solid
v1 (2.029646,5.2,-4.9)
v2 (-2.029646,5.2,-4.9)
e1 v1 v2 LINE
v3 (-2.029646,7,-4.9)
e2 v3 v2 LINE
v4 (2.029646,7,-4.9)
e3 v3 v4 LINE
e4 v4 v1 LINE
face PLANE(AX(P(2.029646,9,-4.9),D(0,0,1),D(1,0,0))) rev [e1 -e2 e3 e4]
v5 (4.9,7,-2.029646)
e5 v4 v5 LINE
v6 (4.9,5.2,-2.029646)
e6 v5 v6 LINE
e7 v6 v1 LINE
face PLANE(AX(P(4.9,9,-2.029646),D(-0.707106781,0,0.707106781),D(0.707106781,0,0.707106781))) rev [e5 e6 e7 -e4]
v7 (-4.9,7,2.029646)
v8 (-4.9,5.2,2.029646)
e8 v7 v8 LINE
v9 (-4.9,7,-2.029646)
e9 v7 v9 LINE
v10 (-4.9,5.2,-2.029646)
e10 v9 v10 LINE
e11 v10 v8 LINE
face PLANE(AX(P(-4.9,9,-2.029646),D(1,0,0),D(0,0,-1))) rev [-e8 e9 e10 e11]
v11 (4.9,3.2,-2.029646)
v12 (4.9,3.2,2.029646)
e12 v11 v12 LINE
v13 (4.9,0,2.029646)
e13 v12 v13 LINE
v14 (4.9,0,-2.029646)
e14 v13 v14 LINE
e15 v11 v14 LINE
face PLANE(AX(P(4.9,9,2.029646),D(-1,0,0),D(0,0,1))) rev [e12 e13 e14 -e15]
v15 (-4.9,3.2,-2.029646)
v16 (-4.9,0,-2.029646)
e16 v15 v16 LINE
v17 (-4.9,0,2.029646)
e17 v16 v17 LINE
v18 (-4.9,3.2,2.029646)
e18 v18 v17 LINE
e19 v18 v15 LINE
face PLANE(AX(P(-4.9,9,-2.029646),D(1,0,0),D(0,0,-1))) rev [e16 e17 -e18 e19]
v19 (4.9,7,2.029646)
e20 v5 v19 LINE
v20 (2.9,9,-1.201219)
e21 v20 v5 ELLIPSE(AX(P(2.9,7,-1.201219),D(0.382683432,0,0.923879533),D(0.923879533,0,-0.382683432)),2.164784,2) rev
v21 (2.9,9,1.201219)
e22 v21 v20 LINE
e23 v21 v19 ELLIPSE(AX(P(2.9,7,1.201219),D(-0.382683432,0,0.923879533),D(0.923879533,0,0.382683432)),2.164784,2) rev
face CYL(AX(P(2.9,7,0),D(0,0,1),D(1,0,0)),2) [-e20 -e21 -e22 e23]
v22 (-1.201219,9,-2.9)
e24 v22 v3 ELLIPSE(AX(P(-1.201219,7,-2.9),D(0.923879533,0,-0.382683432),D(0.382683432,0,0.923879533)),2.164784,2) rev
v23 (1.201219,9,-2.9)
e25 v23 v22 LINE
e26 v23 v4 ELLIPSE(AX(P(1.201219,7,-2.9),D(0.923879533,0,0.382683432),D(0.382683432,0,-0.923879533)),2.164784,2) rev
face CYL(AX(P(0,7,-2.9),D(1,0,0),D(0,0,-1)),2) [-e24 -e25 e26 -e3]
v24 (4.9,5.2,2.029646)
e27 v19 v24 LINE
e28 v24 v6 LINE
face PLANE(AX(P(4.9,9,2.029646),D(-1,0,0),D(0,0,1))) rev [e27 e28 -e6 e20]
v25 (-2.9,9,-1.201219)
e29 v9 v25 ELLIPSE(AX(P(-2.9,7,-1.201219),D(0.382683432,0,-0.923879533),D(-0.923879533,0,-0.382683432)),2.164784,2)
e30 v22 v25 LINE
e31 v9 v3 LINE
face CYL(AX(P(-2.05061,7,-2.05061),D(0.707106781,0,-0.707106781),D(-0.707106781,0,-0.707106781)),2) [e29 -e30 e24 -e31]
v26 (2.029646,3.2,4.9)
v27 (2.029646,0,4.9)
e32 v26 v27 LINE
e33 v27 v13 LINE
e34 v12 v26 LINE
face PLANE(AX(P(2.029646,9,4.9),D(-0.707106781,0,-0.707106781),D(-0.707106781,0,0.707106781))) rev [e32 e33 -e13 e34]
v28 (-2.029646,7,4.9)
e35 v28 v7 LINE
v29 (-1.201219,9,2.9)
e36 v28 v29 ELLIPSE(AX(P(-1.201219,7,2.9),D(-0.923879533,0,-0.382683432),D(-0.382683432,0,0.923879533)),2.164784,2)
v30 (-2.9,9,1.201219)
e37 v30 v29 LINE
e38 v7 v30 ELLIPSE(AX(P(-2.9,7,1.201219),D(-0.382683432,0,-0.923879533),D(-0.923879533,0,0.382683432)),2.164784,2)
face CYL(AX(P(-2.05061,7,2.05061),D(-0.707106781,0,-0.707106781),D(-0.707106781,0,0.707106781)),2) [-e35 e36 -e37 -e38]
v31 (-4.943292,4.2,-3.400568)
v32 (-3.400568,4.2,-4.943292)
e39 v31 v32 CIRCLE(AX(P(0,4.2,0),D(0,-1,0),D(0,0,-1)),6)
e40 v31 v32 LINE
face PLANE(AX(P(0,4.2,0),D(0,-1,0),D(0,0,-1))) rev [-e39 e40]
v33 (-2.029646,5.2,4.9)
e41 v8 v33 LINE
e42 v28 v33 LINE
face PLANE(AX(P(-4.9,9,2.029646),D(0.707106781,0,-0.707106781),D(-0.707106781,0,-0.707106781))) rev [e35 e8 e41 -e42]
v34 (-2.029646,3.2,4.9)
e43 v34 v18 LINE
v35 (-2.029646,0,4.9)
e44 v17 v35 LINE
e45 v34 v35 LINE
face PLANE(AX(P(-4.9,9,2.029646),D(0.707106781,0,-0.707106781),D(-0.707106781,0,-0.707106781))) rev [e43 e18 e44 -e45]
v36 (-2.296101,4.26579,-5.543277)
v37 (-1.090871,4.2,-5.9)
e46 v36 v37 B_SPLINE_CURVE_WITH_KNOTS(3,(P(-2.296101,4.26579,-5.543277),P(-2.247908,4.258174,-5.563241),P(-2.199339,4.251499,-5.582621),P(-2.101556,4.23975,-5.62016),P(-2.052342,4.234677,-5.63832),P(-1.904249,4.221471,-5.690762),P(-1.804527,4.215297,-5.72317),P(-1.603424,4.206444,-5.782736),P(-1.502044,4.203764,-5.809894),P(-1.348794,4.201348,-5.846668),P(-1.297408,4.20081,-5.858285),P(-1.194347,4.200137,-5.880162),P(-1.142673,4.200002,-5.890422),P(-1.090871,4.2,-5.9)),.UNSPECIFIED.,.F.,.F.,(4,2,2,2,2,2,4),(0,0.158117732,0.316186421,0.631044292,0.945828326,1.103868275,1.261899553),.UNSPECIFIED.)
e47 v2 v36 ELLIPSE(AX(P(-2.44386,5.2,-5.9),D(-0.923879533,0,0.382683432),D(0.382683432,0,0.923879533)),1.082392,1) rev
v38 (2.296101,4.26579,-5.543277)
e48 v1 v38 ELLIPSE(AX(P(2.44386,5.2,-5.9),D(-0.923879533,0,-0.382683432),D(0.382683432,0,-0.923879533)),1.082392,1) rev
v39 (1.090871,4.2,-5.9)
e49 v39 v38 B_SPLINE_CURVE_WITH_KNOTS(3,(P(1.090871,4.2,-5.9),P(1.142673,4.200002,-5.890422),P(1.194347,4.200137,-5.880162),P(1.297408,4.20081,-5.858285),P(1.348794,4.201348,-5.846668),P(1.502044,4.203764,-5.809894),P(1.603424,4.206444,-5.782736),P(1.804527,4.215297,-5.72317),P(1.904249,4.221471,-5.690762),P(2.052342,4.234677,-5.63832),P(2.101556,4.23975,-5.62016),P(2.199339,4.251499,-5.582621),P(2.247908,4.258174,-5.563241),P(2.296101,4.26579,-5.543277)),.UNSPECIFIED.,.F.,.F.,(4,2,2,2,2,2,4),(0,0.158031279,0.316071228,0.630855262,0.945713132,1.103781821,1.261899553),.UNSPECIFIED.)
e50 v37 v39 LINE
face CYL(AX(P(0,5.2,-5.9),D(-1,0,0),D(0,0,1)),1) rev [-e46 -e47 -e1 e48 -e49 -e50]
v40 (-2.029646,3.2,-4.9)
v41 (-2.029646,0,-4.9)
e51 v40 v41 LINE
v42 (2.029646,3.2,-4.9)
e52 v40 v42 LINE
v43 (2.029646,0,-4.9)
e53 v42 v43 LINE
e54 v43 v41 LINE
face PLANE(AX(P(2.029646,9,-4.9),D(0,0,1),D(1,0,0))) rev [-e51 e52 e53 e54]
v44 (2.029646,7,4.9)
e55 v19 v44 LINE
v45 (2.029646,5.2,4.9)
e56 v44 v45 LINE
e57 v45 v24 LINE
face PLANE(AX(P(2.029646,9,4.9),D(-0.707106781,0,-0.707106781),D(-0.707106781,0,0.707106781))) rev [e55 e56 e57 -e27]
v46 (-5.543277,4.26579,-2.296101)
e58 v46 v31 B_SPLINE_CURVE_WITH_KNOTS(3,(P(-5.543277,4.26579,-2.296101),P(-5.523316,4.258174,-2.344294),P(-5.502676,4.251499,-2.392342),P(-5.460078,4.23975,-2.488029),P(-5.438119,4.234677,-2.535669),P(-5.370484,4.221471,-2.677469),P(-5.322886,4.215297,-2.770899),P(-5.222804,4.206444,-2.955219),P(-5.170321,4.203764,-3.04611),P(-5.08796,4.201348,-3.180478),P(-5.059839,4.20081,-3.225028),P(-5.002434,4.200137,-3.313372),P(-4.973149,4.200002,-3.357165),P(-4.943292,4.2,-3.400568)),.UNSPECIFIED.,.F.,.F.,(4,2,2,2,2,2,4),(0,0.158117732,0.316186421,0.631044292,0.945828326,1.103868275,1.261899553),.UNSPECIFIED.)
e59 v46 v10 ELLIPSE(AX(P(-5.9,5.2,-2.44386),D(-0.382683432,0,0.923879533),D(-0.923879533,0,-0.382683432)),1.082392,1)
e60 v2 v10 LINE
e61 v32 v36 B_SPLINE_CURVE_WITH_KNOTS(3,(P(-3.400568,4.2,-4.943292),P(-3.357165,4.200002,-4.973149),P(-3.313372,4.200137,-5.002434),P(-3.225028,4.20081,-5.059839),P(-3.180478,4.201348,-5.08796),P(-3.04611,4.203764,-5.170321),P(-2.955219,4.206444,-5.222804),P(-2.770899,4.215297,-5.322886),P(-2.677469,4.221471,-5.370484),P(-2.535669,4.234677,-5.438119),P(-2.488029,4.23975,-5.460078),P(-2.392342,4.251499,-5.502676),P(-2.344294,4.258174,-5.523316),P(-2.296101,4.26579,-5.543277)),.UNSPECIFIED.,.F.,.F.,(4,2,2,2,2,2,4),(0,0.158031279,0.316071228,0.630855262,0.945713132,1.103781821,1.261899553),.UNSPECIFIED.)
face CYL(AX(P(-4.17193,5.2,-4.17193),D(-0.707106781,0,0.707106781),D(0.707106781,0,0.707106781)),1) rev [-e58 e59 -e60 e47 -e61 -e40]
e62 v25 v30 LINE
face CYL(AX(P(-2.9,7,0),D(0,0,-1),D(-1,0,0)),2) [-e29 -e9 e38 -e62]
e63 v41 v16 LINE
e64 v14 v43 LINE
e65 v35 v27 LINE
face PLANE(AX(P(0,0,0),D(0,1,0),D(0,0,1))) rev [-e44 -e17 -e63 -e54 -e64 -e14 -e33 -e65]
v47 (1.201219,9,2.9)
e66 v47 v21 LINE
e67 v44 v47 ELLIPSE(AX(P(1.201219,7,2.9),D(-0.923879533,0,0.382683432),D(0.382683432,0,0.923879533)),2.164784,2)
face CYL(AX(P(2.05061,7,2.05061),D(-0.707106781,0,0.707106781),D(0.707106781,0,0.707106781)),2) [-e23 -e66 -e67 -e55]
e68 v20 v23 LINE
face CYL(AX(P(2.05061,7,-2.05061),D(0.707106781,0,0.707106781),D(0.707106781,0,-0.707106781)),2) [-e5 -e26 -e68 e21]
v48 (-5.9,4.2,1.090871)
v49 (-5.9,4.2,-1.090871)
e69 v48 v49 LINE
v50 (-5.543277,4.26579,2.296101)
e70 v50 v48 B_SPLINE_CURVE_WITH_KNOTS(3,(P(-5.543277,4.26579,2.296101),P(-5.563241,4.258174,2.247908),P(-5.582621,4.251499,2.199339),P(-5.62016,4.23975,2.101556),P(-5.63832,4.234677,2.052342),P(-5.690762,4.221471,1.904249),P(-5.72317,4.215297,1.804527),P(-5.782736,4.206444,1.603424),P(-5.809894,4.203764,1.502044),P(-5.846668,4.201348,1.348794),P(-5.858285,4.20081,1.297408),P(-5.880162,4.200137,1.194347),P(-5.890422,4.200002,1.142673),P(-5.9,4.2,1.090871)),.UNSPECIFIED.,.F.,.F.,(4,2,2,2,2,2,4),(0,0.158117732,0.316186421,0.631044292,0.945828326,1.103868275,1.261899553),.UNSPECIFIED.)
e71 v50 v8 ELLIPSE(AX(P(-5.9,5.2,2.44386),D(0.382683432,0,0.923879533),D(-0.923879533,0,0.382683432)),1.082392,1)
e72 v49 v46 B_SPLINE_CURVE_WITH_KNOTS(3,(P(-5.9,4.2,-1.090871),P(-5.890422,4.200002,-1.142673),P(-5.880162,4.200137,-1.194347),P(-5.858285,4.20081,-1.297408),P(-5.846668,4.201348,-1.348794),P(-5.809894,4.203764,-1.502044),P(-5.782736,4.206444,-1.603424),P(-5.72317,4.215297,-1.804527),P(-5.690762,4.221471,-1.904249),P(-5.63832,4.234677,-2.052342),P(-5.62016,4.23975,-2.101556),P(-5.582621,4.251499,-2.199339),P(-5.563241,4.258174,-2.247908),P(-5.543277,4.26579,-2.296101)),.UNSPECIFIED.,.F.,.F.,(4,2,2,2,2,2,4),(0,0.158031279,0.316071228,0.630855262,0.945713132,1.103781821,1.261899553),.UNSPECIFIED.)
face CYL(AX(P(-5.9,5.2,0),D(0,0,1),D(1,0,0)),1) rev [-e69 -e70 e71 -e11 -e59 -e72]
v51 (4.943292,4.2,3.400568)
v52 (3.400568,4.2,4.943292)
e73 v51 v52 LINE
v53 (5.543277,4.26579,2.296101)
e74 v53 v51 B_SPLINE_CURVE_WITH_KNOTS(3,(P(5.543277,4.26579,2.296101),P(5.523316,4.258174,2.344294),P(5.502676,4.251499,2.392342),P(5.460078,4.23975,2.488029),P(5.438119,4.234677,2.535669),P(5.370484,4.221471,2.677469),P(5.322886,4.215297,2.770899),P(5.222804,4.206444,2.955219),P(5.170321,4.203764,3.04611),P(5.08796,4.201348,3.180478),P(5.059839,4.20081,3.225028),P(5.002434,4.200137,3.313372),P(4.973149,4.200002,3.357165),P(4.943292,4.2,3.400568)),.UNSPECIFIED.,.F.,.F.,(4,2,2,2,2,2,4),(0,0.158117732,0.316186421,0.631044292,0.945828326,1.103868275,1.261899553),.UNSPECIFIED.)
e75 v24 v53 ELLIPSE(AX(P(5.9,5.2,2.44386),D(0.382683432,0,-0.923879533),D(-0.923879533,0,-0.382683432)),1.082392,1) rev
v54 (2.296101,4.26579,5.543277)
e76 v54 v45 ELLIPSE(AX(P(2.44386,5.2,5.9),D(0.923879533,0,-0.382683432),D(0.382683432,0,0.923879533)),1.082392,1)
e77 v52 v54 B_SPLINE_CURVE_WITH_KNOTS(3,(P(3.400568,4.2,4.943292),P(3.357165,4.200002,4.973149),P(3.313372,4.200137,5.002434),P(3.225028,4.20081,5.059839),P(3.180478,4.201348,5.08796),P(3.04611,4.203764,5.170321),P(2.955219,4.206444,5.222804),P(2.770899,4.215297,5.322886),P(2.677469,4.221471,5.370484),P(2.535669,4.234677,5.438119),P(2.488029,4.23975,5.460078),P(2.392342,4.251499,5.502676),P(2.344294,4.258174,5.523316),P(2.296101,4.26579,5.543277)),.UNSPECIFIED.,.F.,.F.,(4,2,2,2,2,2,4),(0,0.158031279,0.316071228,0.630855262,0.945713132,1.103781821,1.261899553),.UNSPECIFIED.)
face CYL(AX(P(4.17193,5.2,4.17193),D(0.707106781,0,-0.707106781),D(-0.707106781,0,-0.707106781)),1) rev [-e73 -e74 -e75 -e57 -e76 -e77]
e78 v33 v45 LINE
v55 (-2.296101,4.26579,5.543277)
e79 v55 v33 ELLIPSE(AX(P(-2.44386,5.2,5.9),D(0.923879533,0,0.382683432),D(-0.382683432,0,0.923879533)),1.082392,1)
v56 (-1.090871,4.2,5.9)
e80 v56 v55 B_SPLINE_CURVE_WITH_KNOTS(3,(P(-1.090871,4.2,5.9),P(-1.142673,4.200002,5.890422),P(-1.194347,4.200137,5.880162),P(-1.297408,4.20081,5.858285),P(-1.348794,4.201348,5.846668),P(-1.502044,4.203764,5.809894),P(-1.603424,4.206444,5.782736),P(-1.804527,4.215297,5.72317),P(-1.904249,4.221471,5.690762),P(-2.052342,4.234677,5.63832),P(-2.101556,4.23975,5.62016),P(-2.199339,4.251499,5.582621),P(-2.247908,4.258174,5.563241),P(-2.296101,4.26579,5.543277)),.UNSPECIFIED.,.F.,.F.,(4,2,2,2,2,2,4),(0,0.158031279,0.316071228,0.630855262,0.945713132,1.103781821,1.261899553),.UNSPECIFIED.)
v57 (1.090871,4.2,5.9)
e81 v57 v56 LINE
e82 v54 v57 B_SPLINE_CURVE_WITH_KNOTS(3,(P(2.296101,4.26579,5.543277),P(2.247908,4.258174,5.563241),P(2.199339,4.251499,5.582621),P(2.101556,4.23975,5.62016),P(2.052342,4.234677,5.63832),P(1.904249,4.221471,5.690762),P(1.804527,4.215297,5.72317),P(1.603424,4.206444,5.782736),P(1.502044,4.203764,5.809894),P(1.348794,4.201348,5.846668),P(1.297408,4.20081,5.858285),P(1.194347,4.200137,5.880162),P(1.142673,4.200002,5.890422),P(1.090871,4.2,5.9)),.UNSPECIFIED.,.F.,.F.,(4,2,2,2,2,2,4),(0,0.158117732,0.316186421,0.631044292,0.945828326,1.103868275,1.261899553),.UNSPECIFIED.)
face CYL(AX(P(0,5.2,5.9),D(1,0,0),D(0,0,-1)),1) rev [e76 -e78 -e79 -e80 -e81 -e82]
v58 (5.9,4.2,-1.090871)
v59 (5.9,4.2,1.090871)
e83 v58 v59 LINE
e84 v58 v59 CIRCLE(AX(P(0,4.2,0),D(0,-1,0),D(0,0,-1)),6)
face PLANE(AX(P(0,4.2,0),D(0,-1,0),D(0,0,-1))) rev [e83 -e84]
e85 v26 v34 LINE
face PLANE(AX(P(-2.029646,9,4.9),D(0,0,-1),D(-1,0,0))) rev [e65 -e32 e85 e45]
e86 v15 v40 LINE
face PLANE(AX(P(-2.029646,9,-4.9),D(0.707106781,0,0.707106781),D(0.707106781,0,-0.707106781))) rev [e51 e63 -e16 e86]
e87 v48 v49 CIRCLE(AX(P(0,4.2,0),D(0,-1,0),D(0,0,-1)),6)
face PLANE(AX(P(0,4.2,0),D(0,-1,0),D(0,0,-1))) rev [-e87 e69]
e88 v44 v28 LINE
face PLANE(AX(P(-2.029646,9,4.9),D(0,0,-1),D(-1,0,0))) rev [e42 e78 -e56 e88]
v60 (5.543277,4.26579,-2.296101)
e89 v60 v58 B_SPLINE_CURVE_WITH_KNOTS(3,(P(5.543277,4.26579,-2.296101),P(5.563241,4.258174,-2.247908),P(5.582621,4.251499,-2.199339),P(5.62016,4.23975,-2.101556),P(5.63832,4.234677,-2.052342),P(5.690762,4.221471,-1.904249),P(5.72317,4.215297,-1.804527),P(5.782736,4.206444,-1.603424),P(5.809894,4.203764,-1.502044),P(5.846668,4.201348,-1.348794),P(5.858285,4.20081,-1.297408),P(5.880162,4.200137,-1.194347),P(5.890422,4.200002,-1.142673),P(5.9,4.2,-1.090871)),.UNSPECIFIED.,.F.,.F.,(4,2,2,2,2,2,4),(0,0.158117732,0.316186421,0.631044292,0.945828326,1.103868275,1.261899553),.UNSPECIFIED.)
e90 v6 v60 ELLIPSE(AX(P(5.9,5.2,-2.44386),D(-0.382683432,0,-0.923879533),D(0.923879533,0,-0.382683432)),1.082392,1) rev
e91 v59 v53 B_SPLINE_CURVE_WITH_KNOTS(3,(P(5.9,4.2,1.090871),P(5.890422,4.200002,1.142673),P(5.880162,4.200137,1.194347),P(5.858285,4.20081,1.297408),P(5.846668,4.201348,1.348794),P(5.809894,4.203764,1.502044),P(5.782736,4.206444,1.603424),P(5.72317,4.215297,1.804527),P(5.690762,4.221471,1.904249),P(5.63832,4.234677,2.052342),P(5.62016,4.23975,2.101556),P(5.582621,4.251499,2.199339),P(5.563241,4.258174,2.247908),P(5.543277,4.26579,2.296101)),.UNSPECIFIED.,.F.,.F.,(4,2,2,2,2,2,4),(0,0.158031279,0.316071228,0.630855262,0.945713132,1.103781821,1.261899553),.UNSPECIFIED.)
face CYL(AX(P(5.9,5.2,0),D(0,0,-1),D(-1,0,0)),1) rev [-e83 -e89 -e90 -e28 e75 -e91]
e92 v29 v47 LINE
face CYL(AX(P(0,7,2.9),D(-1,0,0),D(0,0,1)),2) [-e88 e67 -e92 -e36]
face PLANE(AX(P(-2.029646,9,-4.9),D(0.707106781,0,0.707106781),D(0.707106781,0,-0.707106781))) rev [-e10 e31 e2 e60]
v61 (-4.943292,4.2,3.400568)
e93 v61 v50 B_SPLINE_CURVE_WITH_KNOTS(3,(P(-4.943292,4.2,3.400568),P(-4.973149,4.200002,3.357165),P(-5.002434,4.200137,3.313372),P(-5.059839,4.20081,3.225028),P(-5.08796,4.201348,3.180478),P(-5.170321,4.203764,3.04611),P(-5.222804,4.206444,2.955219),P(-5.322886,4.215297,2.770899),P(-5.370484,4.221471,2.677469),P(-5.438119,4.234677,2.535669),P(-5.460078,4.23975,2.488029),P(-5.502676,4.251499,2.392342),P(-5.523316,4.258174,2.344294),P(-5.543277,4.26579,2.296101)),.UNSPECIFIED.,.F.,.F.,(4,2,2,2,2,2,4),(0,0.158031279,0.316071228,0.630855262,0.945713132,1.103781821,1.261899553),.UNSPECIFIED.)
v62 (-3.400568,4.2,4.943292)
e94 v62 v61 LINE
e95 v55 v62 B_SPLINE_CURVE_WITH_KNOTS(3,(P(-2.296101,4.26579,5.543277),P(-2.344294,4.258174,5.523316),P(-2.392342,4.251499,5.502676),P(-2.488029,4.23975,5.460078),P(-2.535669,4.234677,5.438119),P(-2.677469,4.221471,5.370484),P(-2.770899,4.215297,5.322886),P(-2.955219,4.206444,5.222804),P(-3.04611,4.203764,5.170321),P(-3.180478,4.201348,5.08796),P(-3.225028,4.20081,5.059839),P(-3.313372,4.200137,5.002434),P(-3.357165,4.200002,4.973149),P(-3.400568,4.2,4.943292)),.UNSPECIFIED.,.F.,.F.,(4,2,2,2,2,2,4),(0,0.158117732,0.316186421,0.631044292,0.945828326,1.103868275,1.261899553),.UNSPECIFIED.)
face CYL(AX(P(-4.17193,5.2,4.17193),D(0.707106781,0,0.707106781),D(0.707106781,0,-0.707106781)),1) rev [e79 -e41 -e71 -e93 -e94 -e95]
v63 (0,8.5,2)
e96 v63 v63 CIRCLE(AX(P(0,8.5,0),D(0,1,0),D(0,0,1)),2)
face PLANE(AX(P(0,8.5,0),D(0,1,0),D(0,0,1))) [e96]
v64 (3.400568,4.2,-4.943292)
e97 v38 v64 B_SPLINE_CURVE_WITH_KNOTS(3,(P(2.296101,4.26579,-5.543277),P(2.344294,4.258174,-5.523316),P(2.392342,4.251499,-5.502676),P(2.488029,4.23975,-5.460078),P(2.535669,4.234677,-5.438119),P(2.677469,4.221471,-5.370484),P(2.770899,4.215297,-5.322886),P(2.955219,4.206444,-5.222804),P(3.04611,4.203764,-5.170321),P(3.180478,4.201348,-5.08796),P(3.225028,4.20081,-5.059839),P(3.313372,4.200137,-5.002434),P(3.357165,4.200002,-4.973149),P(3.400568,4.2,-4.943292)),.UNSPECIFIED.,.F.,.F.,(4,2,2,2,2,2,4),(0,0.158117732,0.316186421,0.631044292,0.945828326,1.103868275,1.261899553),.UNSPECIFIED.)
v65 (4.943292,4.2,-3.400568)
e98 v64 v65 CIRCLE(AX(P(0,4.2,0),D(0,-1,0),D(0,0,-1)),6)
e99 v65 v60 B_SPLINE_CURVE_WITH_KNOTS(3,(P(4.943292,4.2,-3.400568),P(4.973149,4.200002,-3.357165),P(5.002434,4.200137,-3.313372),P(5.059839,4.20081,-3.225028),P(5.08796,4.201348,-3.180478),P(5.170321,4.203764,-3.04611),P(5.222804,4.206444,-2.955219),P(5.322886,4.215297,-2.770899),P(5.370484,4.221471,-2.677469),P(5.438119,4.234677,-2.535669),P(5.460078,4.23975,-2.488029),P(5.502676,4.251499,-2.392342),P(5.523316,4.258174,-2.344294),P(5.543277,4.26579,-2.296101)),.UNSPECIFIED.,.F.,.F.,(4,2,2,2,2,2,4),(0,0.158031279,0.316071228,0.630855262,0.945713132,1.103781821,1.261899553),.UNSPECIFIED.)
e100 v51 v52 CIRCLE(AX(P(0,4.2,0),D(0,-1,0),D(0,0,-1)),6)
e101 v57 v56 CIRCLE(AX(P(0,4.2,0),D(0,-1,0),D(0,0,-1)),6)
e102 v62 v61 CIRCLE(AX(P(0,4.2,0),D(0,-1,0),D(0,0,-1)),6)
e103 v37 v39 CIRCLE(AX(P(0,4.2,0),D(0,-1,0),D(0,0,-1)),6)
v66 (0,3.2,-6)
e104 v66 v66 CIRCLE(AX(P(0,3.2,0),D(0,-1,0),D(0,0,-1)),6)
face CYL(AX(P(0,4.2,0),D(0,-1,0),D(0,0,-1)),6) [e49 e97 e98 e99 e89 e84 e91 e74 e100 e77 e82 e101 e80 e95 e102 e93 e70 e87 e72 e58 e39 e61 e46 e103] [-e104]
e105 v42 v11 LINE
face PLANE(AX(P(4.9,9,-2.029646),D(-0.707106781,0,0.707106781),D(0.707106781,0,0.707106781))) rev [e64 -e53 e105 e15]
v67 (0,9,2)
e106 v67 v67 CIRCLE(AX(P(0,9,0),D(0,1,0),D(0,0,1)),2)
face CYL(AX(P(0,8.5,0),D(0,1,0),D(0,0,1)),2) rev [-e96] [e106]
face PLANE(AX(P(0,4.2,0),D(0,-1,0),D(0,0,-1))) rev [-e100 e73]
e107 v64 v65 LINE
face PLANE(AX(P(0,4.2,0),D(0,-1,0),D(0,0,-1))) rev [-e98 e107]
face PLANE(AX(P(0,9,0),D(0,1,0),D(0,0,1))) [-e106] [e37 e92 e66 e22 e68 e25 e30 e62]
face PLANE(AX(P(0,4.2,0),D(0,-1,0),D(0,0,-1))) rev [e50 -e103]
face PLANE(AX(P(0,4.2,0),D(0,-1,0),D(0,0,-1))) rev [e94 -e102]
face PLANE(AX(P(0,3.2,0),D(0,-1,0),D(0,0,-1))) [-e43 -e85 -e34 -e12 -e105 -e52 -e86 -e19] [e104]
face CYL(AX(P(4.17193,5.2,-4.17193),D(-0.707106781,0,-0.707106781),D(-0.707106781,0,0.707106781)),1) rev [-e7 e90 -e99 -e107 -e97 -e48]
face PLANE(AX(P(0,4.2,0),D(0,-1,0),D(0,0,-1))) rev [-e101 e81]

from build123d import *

# Parameters (mm, degrees)
BOSS_EXTRUDE1_DEPTH = 9
SKETCH2_R           = 2
CUT_EXTRUDE1_DEPTH  = 0.5
BOSS_EXTRUDE2_START = -3.2
SKETCH3_R           = 6
BOSS_EXTRUDE2_DEPTH = 1
FILLET1_R           = 2
FILLET2_R           = 1


with BuildPart() as part:
    # Sketch1 → Boss-Extrude1 (new body)
    with BuildSketch(Plane(origin=(0, 0, 0), x_dir=(1, 0, 0), z_dir=(0, 1, 0))):
        Polygon((2.029646456, 4.9), (-2.029646456, 4.9), (-4.9, 2.029646456), (-4.9, -2.029646456), (-2.029646456, -4.9), (2.029646456, -4.9), (4.9, -2.029646456), (4.9, 2.029646456), align=None)
    extrude(amount=BOSS_EXTRUDE1_DEPTH)

    # Sketch2 → Cut-Extrude1 (cut)
    with BuildSketch(Plane(origin=(0, 9, 0), x_dir=(1, 0, 0), z_dir=(0, 1, 0))):
        with Locations(Location((0, 0, 0), (0, 0, 270))):
            Circle(SKETCH2_R)
    extrude(amount=-CUT_EXTRUDE1_DEPTH, mode=Mode.SUBTRACT)

    # Sketch3 → Boss-Extrude2 (add)
    with BuildSketch(Plane.XZ.offset(BOSS_EXTRUDE2_START)):
        with Locations(Location((0, 0, 0), (0, 0, 270))):
            Circle(SKETCH3_R)
    extrude(amount=-BOSS_EXTRUDE2_DEPTH)

    # Fillet1
    fillet1_edges = [part.edges().sort_by_distance(p)[0] for p in [
        (-3.464823228, 9, -3.464823228),
        (-4.9, 9, 0),
        (-3.464823228, 9, 3.464823228),
        (0, 9, 4.9),
        (3.464823228, 9, 3.464823228),
        (4.9, 9, 0),
        (3.464823228, 9, -3.464823228),
        (0, 9, -4.9),
    ]]
    fillet(fillet1_edges, radius=FILLET1_R)

    # Fillet2
    # the kernel refuses this fillet: 1 mm, written as the material it adds along each edge
    with BuildSketch(Plane(origin=(4.9, 4.2, -4.529646456), x_dir=(1, 0, 0), z_dir=(0, 0, 1))) as fillet2_piece_1_section:
        with BuildLine():
            CenterArc((FILLET2_R, FILLET2_R), FILLET2_R, 180, 90)
            Line((0, FILLET2_R), (0, 0))
            Line((0, 0), (FILLET2_R, 0))
        make_face()
    fillet2_piece_1 = extrude(amount=9.059292911, mode=Mode.PRIVATE)
    fillet2_piece_1 = split(fillet2_piece_1, bisect_by=Plane(origin=(6.015133886, 4.441621339, -0.91451257), z_dir=(-0.7071067811865472, 0, 0.7071067811865478)), keep=Keep.TOP, mode=Mode.PRIVATE)
    fillet2_piece_1 = split(fillet2_piece_1, bisect_by=Plane(origin=(6.015133886, 4.441621339, 0.91451257), z_dir=(-0.7071067811865478, 0, -0.7071067811865474)), keep=Keep.TOP, mode=Mode.PRIVATE)
    add(fillet2_piece_1)
    with BuildSketch(Plane(origin=(-4.529646456, 4.2, -4.9), x_dir=(0, 1, 0), z_dir=(1, 0, 0))) as fillet2_piece_2_section:
        with BuildLine():
            CenterArc((FILLET2_R, -FILLET2_R), FILLET2_R, 90, 90)
            Line((0, -FILLET2_R), (0, 0))
            Line((0, 0), (FILLET2_R, 0))
        make_face()
    fillet2_piece_2 = extrude(amount=9.059292911, mode=Mode.PRIVATE)
    fillet2_piece_2 = split(fillet2_piece_2, bisect_by=Plane(origin=(-0.91451257, 4.441621339, -6.015133886), z_dir=(0.7071067811865479, 0, 0.7071067811865472)), keep=Keep.TOP, mode=Mode.PRIVATE)
    fillet2_piece_2 = split(fillet2_piece_2, bisect_by=Plane(origin=(0.91451257, 4.441621339, -6.015133886), z_dir=(-0.7071067811865472, 0, 0.7071067811865478)), keep=Keep.TOP, mode=Mode.PRIVATE)
    add(fillet2_piece_2)
    with BuildSketch(Plane(origin=(0.261879503, 4.2, -6.667766953), x_dir=(0.7071067811865472, 0, -0.7071067811865479), z_dir=(0.7071067811865479, 0, 0.7071067811865474))) as fillet2_piece_3_section:
        with BuildLine():
            CenterArc((FILLET2_R, FILLET2_R), FILLET2_R, 180, 90)
            Line((0, FILLET2_R), (0, 0))
            Line((0, 0), (FILLET2_R, 0))
        make_face()
    fillet2_piece_3 = extrude(amount=9.059292911, mode=Mode.PRIVATE)
    fillet2_piece_3 = split(fillet2_piece_3, bisect_by=Plane(origin=(3.606683921, 4.441621339, -4.9), z_dir=(0, 0, 1)), keep=Keep.TOP, mode=Mode.PRIVATE)
    fillet2_piece_3 = split(fillet2_piece_3, bisect_by=Plane(origin=(4.9, 4.441621339, -3.606683921), z_dir=(-1, 0, 0)), keep=Keep.TOP, mode=Mode.PRIVATE)
    add(fillet2_piece_3)
    with BuildSketch(Plane(origin=(6.667766953, 4.2, 0.261879503), x_dir=(0.7071067811865478, 0, 0.7071067811865474), z_dir=(-0.7071067811865474, 0, 0.7071067811865478))) as fillet2_piece_4_section:
        with BuildLine():
            CenterArc((FILLET2_R, FILLET2_R), FILLET2_R, 180, 90)
            Line((0, FILLET2_R), (0, 0))
            Line((0, 0), (FILLET2_R, 0))
        make_face()
    fillet2_piece_4 = extrude(amount=9.059292911, mode=Mode.PRIVATE)
    fillet2_piece_4 = split(fillet2_piece_4, bisect_by=Plane(origin=(4.9, 4.441621339, 3.606683921), z_dir=(-1, 0, 0)), keep=Keep.TOP, mode=Mode.PRIVATE)
    fillet2_piece_4 = split(fillet2_piece_4, bisect_by=Plane(origin=(3.606683921, 4.441621339, 4.9), z_dir=(0, 0, -1)), keep=Keep.TOP, mode=Mode.PRIVATE)
    add(fillet2_piece_4)
    with BuildSketch(Plane(origin=(4.529646456, 4.2, 4.9), x_dir=(0, 0, 1), z_dir=(-1, 0, 0))) as fillet2_piece_5_section:
        with BuildLine():
            CenterArc((FILLET2_R, FILLET2_R), FILLET2_R, 180, 90)
            Line((0, FILLET2_R), (0, 0))
            Line((0, 0), (FILLET2_R, 0))
        make_face()
    fillet2_piece_5 = extrude(amount=9.059292911, mode=Mode.PRIVATE)
    fillet2_piece_5 = split(fillet2_piece_5, bisect_by=Plane(origin=(0.91451257, 4.441621339, 6.015133886), z_dir=(-0.7071067811865478, 0, -0.7071067811865474)), keep=Keep.TOP, mode=Mode.PRIVATE)
    fillet2_piece_5 = split(fillet2_piece_5, bisect_by=Plane(origin=(-0.91451257, 4.441621339, 6.015133886), z_dir=(0.7071067811865471, 0, -0.707106781186548)), keep=Keep.TOP, mode=Mode.PRIVATE)
    add(fillet2_piece_5)
    with BuildSketch(Plane(origin=(-0.261879503, 4.2, 6.667766953), x_dir=(-0.7071067811865471, 0, 0.707106781186548), z_dir=(-0.707106781186548, 0, -0.7071067811865471))) as fillet2_piece_6_section:
        with BuildLine():
            CenterArc((FILLET2_R, FILLET2_R), FILLET2_R, 180, 90)
            Line((0, FILLET2_R), (0, 0))
            Line((0, 0), (FILLET2_R, 0))
        make_face()
    fillet2_piece_6 = extrude(amount=9.059292911, mode=Mode.PRIVATE)
    fillet2_piece_6 = split(fillet2_piece_6, bisect_by=Plane(origin=(-4.9, 4.441621339, 3.606683921), z_dir=(1, 0, 0)), keep=Keep.TOP, mode=Mode.PRIVATE)
    fillet2_piece_6 = split(fillet2_piece_6, bisect_by=Plane(origin=(-3.606683921, 4.441621339, 4.9), z_dir=(0, 0, -1)), keep=Keep.TOP, mode=Mode.PRIVATE)
    add(fillet2_piece_6)
    with BuildSketch(Plane(origin=(-4.9, 4.2, 4.529646456), x_dir=(-1, 0, 0), z_dir=(0, 0, -1))) as fillet2_piece_7_section:
        with BuildLine():
            CenterArc((FILLET2_R, FILLET2_R), FILLET2_R, 180, 90)
            Line((0, FILLET2_R), (0, 0))
            Line((0, 0), (FILLET2_R, 0))
        make_face()
    fillet2_piece_7 = extrude(amount=9.059292911, mode=Mode.PRIVATE)
    fillet2_piece_7 = split(fillet2_piece_7, bisect_by=Plane(origin=(-6.015133886, 4.441621339, -0.91451257), z_dir=(0.7071067811865479, 0, 0.7071067811865472)), keep=Keep.TOP, mode=Mode.PRIVATE)
    fillet2_piece_7 = split(fillet2_piece_7, bisect_by=Plane(origin=(-6.015133886, 4.441621339, 0.91451257), z_dir=(0.7071067811865471, 0, -0.707106781186548)), keep=Keep.TOP, mode=Mode.PRIVATE)
    add(fillet2_piece_7)
    with BuildSketch(Plane(origin=(-6.667766953, 4.2, -0.261879503), x_dir=(0, 1, 0), z_dir=(0.7071067811865472, 0, -0.7071067811865479))) as fillet2_piece_8_section:
        with BuildLine():
            CenterArc((FILLET2_R, -FILLET2_R), FILLET2_R, 90, 90)
            Line((0, -FILLET2_R), (0, 0))
            Line((0, 0), (FILLET2_R, 0))
        make_face()
    fillet2_piece_8 = extrude(amount=9.059292911, mode=Mode.PRIVATE)
    fillet2_piece_8 = split(fillet2_piece_8, bisect_by=Plane(origin=(-3.606683921, 4.441621339, -4.9), z_dir=(0, 0, 1)), keep=Keep.TOP, mode=Mode.PRIVATE)
    fillet2_piece_8 = split(fillet2_piece_8, bisect_by=Plane(origin=(-4.9, 4.441621339, -3.606683921), z_dir=(1, 0, 0)), keep=Keep.TOP, mode=Mode.PRIVATE)
    add(fillet2_piece_8)
    with BuildSketch(Plane(origin=(0.261879503, 4.2, -6.667766953), x_dir=(0.7071067811865472, 0, -0.7071067811865479), z_dir=(0.7071067811865479, 0, 0.7071067811865474))) as fillet2_piece_9a_section:
        with BuildLine():
            CenterArc((FILLET2_R, FILLET2_R), FILLET2_R, 180, 90)
            Line((0, FILLET2_R), (0, 0))
            Line((0, 0), (FILLET2_R, 0))
        make_face()
    fillet2_piece_9a = extrude(amount=9.059292911, mode=Mode.PRIVATE)
    fillet2_piece_9a = fillet2_piece_9a & Plane(origin=(0, 4.443429881, 0), x_dir=(0, 0, -1), z_dir=(0, -1, 0)) * Cylinder(6, 23, mode=Mode.PRIVATE)
    fillet2_piece_9a = split(fillet2_piece_9a, bisect_by=Plane(origin=(4.9, 4.443429881, -1.840690438), z_dir=(1, 0, 0)), keep=Keep.TOP, mode=Mode.PRIVATE)
    with BuildSketch(Plane(origin=(4.9, 4.2, -4.529646456), x_dir=(1, 0, 0), z_dir=(0, 0, 1))) as fillet2_piece_9b_section:
        with BuildLine():
            CenterArc((FILLET2_R, FILLET2_R), FILLET2_R, 180, 90)
            Line((0, FILLET2_R), (0, 0))
            Line((0, 0), (FILLET2_R, 0))
        make_face()
    fillet2_piece_9b = extrude(amount=9.059292911, mode=Mode.PRIVATE)
    fillet2_piece_9b = fillet2_piece_9b & Plane(origin=(0, 4.443429353, 0), x_dir=(0, 0, -1), z_dir=(0, -1, 0)) * Cylinder(6, 23, mode=Mode.PRIVATE)
    fillet2_piece_9b = split(fillet2_piece_9b, bisect_by=Plane(origin=(4.766386863, 4.443429353, -2.163259593), z_dir=(0.7071067811865472, 0, -0.7071067811865478)), keep=Keep.TOP, mode=Mode.PRIVATE)
    fillet2_piece_9 = fillet2_piece_9a & fillet2_piece_9b
    add(fillet2_piece_9)
    with BuildSketch(Plane(origin=(4.9, 4.2, -4.529646456), x_dir=(1, 0, 0), z_dir=(0, 0, 1))) as fillet2_piece_10a_section:
        with BuildLine():
            CenterArc((FILLET2_R, FILLET2_R), FILLET2_R, 180, 90)
            Line((0, FILLET2_R), (0, 0))
            Line((0, 0), (FILLET2_R, 0))
        make_face()
    fillet2_piece_10a = extrude(amount=9.059292911, mode=Mode.PRIVATE)
    fillet2_piece_10a = fillet2_piece_10a & Plane(origin=(0, 4.443429527, 0), x_dir=(0, 0, -1), z_dir=(0, -1, 0)) * Cylinder(6, 23, mode=Mode.PRIVATE)
    fillet2_piece_10a = split(fillet2_piece_10a, bisect_by=Plane(origin=(4.766387172, 4.443429527, 2.163259283), z_dir=(0.7071067811865478, 0, 0.7071067811865474)), keep=Keep.TOP, mode=Mode.PRIVATE)
    with BuildSketch(Plane(origin=(6.667766953, 4.2, 0.261879503), x_dir=(0.7071067811865478, 0, 0.7071067811865474), z_dir=(-0.7071067811865474, 0, 0.7071067811865478))) as fillet2_piece_10b_section:
        with BuildLine():
            CenterArc((FILLET2_R, FILLET2_R), FILLET2_R, 180, 90)
            Line((0, FILLET2_R), (0, 0))
            Line((0, 0), (FILLET2_R, 0))
        make_face()
    fillet2_piece_10b = extrude(amount=9.059292911, mode=Mode.PRIVATE)
    fillet2_piece_10b = fillet2_piece_10b & Plane(origin=(0, 4.443429353, 0), x_dir=(0, 0, -1), z_dir=(0, -1, 0)) * Cylinder(6, 23, mode=Mode.PRIVATE)
    fillet2_piece_10b = split(fillet2_piece_10b, bisect_by=Plane(origin=(4.9, 4.443429353, 1.840688945), z_dir=(1, 0, 0)), keep=Keep.TOP, mode=Mode.PRIVATE)
    fillet2_piece_10 = fillet2_piece_10a & fillet2_piece_10b
    add(fillet2_piece_10)
    with BuildSketch(Plane(origin=(-4.529646456, 4.2, -4.9), x_dir=(0, 1, 0), z_dir=(1, 0, 0))) as fillet2_piece_11a_section:
        with BuildLine():
            CenterArc((FILLET2_R, -FILLET2_R), FILLET2_R, 90, 90)
            Line((0, -FILLET2_R), (0, 0))
            Line((0, 0), (FILLET2_R, 0))
        make_face()
    fillet2_piece_11a = extrude(amount=9.059292911, mode=Mode.PRIVATE)
    fillet2_piece_11a = split(fillet2_piece_11a, bisect_by=Plane(origin=(-2.163259583, 4.443429177, -4.766386873), z_dir=(-0.7071067811865479, 0, -0.7071067811865472)), keep=Keep.TOP, mode=Mode.PRIVATE)
    fillet2_piece_11a = fillet2_piece_11a & Plane(origin=(0, 4.443429177, 0), x_dir=(0, 0, -1), z_dir=(0, -1, 0)) * Cylinder(6, 23, mode=Mode.PRIVATE)
    with BuildSketch(Plane(origin=(-6.667766953, 4.2, -0.261879503), x_dir=(0, 1, 0), z_dir=(0.7071067811865472, 0, -0.7071067811865479))) as fillet2_piece_11b_section:
        with BuildLine():
            CenterArc((FILLET2_R, -FILLET2_R), FILLET2_R, 90, 90)
            Line((0, -FILLET2_R), (0, 0))
            Line((0, 0), (FILLET2_R, 0))
        make_face()
    fillet2_piece_11b = extrude(amount=9.059292911, mode=Mode.PRIVATE)
    fillet2_piece_11b = split(fillet2_piece_11b, bisect_by=Plane(origin=(-1.840689514, 4.443429808, -4.9), z_dir=(0, 0, -1)), keep=Keep.TOP, mode=Mode.PRIVATE)
    fillet2_piece_11b = fillet2_piece_11b & Plane(origin=(0, 4.443429808, 0), x_dir=(0, 0, -1), z_dir=(0, -1, 0)) * Cylinder(6, 23, mode=Mode.PRIVATE)
    fillet2_piece_11 = fillet2_piece_11a & fillet2_piece_11b
    add(fillet2_piece_11)
    with BuildSketch(Plane(origin=(-4.529646456, 4.2, -4.9), x_dir=(0, 1, 0), z_dir=(1, 0, 0))) as fillet2_piece_12a_section:
        with BuildLine():
            CenterArc((FILLET2_R, -FILLET2_R), FILLET2_R, 90, 90)
            Line((0, -FILLET2_R), (0, 0))
            Line((0, 0), (FILLET2_R, 0))
        make_face()
    fillet2_piece_12a = extrude(amount=9.059292911, mode=Mode.PRIVATE)
    fillet2_piece_12a = split(fillet2_piece_12a, bisect_by=Plane(origin=(2.163259191, 4.443429808, -4.766387265), z_dir=(0.7071067811865472, 0, -0.7071067811865478)), keep=Keep.TOP, mode=Mode.PRIVATE)
    fillet2_piece_12a = fillet2_piece_12a & Plane(origin=(0, 4.443429808, 0), x_dir=(0, 0, -1), z_dir=(0, -1, 0)) * Cylinder(6, 23, mode=Mode.PRIVATE)
    with BuildSketch(Plane(origin=(0.261879503, 4.2, -6.667766953), x_dir=(0.7071067811865472, 0, -0.7071067811865479), z_dir=(0.7071067811865479, 0, 0.7071067811865474))) as fillet2_piece_12b_section:
        with BuildLine():
            CenterArc((FILLET2_R, FILLET2_R), FILLET2_R, 180, 90)
            Line((0, FILLET2_R), (0, 0))
            Line((0, 0), (FILLET2_R, 0))
        make_face()
    fillet2_piece_12b = extrude(amount=9.059292911, mode=Mode.PRIVATE)
    fillet2_piece_12b = split(fillet2_piece_12b, bisect_by=Plane(origin=(1.840689039, 4.443429385, -4.9), z_dir=(0, 0, -1)), keep=Keep.TOP, mode=Mode.PRIVATE)
    fillet2_piece_12b = fillet2_piece_12b & Plane(origin=(0, 4.443429385, 0), x_dir=(0, 0, -1), z_dir=(0, -1, 0)) * Cylinder(6, 23, mode=Mode.PRIVATE)
    fillet2_piece_12 = fillet2_piece_12a & fillet2_piece_12b
    add(fillet2_piece_12)
    with BuildSketch(Plane(origin=(6.667766953, 4.2, 0.261879503), x_dir=(0.7071067811865478, 0, 0.7071067811865474), z_dir=(-0.7071067811865474, 0, 0.7071067811865478))) as fillet2_piece_13a_section:
        with BuildLine():
            CenterArc((FILLET2_R, FILLET2_R), FILLET2_R, 180, 90)
            Line((0, FILLET2_R), (0, 0))
            Line((0, 0), (FILLET2_R, 0))
        make_face()
    fillet2_piece_13a = extrude(amount=9.059292911, mode=Mode.PRIVATE)
    fillet2_piece_13a = fillet2_piece_13a & Plane(origin=(0, 4.443429527, 0), x_dir=(0, 0, -1), z_dir=(0, -1, 0)) * Cylinder(6, 23, mode=Mode.PRIVATE)
    fillet2_piece_13a = split(fillet2_piece_13a, bisect_by=Plane(origin=(1.840689383, 4.443429527, 4.9), z_dir=(0, 0, 1)), keep=Keep.TOP, mode=Mode.PRIVATE)
    with BuildSketch(Plane(origin=(4.529646456, 4.2, 4.9), x_dir=(0, 0, 1), z_dir=(-1, 0, 0))) as fillet2_piece_13b_section:
        with BuildLine():
            CenterArc((FILLET2_R, FILLET2_R), FILLET2_R, 180, 90)
            Line((0, FILLET2_R), (0, 0))
            Line((0, 0), (FILLET2_R, 0))
        make_face()
    fillet2_piece_13b = extrude(amount=9.059292911, mode=Mode.PRIVATE)
    fillet2_piece_13b = fillet2_piece_13b & Plane(origin=(0, 4.443429353, 0), x_dir=(0, 0, -1), z_dir=(0, -1, 0)) * Cylinder(6, 23, mode=Mode.PRIVATE)
    fillet2_piece_13b = split(fillet2_piece_13b, bisect_by=Plane(origin=(2.163259593, 4.443429353, 4.766386863), z_dir=(0.7071067811865478, 0, 0.7071067811865474)), keep=Keep.TOP, mode=Mode.PRIVATE)
    fillet2_piece_13 = fillet2_piece_13a & fillet2_piece_13b
    add(fillet2_piece_13)
    with BuildSketch(Plane(origin=(4.529646456, 4.2, 4.9), x_dir=(0, 0, 1), z_dir=(-1, 0, 0))) as fillet2_piece_14a_section:
        with BuildLine():
            CenterArc((FILLET2_R, FILLET2_R), FILLET2_R, 180, 90)
            Line((0, FILLET2_R), (0, 0))
            Line((0, 0), (FILLET2_R, 0))
        make_face()
    fillet2_piece_14a = extrude(amount=9.059292911, mode=Mode.PRIVATE)
    fillet2_piece_14a = fillet2_piece_14a & Plane(origin=(0, 4.443429527, 0), x_dir=(0, 0, -1), z_dir=(0, -1, 0)) * Cylinder(6, 23, mode=Mode.PRIVATE)
    fillet2_piece_14a = split(fillet2_piece_14a, bisect_by=Plane(origin=(-2.163259283, 4.443429527, 4.766387172), z_dir=(-0.7071067811865471, 0, 0.707106781186548)), keep=Keep.TOP, mode=Mode.PRIVATE)
    with BuildSketch(Plane(origin=(-0.261879503, 4.2, 6.667766953), x_dir=(-0.7071067811865471, 0, 0.707106781186548), z_dir=(-0.707106781186548, 0, -0.7071067811865471))) as fillet2_piece_14b_section:
        with BuildLine():
            CenterArc((FILLET2_R, FILLET2_R), FILLET2_R, 180, 90)
            Line((0, FILLET2_R), (0, 0))
            Line((0, 0), (FILLET2_R, 0))
        make_face()
    fillet2_piece_14b = extrude(amount=9.059292911, mode=Mode.PRIVATE)
    fillet2_piece_14b = fillet2_piece_14b & Plane(origin=(0, 4.443429353, 0), x_dir=(0, 0, -1), z_dir=(0, -1, 0)) * Cylinder(6, 23, mode=Mode.PRIVATE)
    fillet2_piece_14b = split(fillet2_piece_14b, bisect_by=Plane(origin=(-1.840688945, 4.443429353, 4.9), z_dir=(0, 0, 1)), keep=Keep.TOP, mode=Mode.PRIVATE)
    fillet2_piece_14 = fillet2_piece_14a & fillet2_piece_14b
    add(fillet2_piece_14)
    with BuildSketch(Plane(origin=(-0.261879503, 4.2, 6.667766953), x_dir=(-0.7071067811865471, 0, 0.707106781186548), z_dir=(-0.707106781186548, 0, -0.7071067811865471))) as fillet2_piece_15a_section:
        with BuildLine():
            CenterArc((FILLET2_R, FILLET2_R), FILLET2_R, 180, 90)
            Line((0, FILLET2_R), (0, 0))
            Line((0, 0), (FILLET2_R, 0))
        make_face()
    fillet2_piece_15a = extrude(amount=9.059292911, mode=Mode.PRIVATE)
    fillet2_piece_15a = fillet2_piece_15a & Plane(origin=(0, 4.443429527, 0), x_dir=(0, 0, -1), z_dir=(0, -1, 0)) * Cylinder(6, 23, mode=Mode.PRIVATE)
    fillet2_piece_15a = split(fillet2_piece_15a, bisect_by=Plane(origin=(-4.9, 4.443429527, 1.840689383), z_dir=(-1, 0, 0)), keep=Keep.TOP, mode=Mode.PRIVATE)
    with BuildSketch(Plane(origin=(-4.9, 4.2, 4.529646456), x_dir=(-1, 0, 0), z_dir=(0, 0, -1))) as fillet2_piece_15b_section:
        with BuildLine():
            CenterArc((FILLET2_R, FILLET2_R), FILLET2_R, 180, 90)
            Line((0, FILLET2_R), (0, 0))
            Line((0, 0), (FILLET2_R, 0))
        make_face()
    fillet2_piece_15b = extrude(amount=9.059292911, mode=Mode.PRIVATE)
    fillet2_piece_15b = fillet2_piece_15b & Plane(origin=(0, 4.443429385, 0), x_dir=(0, 0, -1), z_dir=(0, -1, 0)) * Cylinder(6, 23, mode=Mode.PRIVATE)
    fillet2_piece_15b = split(fillet2_piece_15b, bisect_by=Plane(origin=(-4.766386929, 4.443429385, 2.163259526), z_dir=(-0.7071067811865471, 0, 0.707106781186548)), keep=Keep.TOP, mode=Mode.PRIVATE)
    fillet2_piece_15 = fillet2_piece_15a & fillet2_piece_15b
    add(fillet2_piece_15)
    with BuildSketch(Plane(origin=(-6.667766953, 4.2, -0.261879503), x_dir=(0, 1, 0), z_dir=(0.7071067811865472, 0, -0.7071067811865479))) as fillet2_piece_16a_section:
        with BuildLine():
            CenterArc((FILLET2_R, -FILLET2_R), FILLET2_R, 90, 90)
            Line((0, -FILLET2_R), (0, 0))
            Line((0, 0), (FILLET2_R, 0))
        make_face()
    fillet2_piece_16a = extrude(amount=9.059292911, mode=Mode.PRIVATE)
    fillet2_piece_16a = split(fillet2_piece_16a, bisect_by=Plane(origin=(-4.9, 4.443429177, -1.840688959), z_dir=(-1, 0, 0)), keep=Keep.TOP, mode=Mode.PRIVATE)
    fillet2_piece_16a = fillet2_piece_16a & Plane(origin=(0, 4.443429177, 0), x_dir=(0, 0, -1), z_dir=(0, -1, 0)) * Cylinder(6, 23, mode=Mode.PRIVATE)
    with BuildSketch(Plane(origin=(-4.9, 4.2, 4.529646456), x_dir=(-1, 0, 0), z_dir=(0, 0, -1))) as fillet2_piece_16b_section:
        with BuildLine():
            CenterArc((FILLET2_R, FILLET2_R), FILLET2_R, 180, 90)
            Line((0, FILLET2_R), (0, 0))
            Line((0, 0), (FILLET2_R, 0))
        make_face()
    fillet2_piece_16b = extrude(amount=9.059292911, mode=Mode.PRIVATE)
    fillet2_piece_16b = split(fillet2_piece_16b, bisect_by=Plane(origin=(-4.766387919, 4.443429881, -2.163258537), z_dir=(-0.7071067811865479, 0, -0.7071067811865472)), keep=Keep.TOP, mode=Mode.PRIVATE)
    fillet2_piece_16b = fillet2_piece_16b & Plane(origin=(0, 4.443429881, 0), x_dir=(0, 0, -1), z_dir=(0, -1, 0)) * Cylinder(6, 23, mode=Mode.PRIVATE)
    fillet2_piece_16 = fillet2_piece_16a & fillet2_piece_16b
    add(fillet2_piece_16)


solid = part.part
